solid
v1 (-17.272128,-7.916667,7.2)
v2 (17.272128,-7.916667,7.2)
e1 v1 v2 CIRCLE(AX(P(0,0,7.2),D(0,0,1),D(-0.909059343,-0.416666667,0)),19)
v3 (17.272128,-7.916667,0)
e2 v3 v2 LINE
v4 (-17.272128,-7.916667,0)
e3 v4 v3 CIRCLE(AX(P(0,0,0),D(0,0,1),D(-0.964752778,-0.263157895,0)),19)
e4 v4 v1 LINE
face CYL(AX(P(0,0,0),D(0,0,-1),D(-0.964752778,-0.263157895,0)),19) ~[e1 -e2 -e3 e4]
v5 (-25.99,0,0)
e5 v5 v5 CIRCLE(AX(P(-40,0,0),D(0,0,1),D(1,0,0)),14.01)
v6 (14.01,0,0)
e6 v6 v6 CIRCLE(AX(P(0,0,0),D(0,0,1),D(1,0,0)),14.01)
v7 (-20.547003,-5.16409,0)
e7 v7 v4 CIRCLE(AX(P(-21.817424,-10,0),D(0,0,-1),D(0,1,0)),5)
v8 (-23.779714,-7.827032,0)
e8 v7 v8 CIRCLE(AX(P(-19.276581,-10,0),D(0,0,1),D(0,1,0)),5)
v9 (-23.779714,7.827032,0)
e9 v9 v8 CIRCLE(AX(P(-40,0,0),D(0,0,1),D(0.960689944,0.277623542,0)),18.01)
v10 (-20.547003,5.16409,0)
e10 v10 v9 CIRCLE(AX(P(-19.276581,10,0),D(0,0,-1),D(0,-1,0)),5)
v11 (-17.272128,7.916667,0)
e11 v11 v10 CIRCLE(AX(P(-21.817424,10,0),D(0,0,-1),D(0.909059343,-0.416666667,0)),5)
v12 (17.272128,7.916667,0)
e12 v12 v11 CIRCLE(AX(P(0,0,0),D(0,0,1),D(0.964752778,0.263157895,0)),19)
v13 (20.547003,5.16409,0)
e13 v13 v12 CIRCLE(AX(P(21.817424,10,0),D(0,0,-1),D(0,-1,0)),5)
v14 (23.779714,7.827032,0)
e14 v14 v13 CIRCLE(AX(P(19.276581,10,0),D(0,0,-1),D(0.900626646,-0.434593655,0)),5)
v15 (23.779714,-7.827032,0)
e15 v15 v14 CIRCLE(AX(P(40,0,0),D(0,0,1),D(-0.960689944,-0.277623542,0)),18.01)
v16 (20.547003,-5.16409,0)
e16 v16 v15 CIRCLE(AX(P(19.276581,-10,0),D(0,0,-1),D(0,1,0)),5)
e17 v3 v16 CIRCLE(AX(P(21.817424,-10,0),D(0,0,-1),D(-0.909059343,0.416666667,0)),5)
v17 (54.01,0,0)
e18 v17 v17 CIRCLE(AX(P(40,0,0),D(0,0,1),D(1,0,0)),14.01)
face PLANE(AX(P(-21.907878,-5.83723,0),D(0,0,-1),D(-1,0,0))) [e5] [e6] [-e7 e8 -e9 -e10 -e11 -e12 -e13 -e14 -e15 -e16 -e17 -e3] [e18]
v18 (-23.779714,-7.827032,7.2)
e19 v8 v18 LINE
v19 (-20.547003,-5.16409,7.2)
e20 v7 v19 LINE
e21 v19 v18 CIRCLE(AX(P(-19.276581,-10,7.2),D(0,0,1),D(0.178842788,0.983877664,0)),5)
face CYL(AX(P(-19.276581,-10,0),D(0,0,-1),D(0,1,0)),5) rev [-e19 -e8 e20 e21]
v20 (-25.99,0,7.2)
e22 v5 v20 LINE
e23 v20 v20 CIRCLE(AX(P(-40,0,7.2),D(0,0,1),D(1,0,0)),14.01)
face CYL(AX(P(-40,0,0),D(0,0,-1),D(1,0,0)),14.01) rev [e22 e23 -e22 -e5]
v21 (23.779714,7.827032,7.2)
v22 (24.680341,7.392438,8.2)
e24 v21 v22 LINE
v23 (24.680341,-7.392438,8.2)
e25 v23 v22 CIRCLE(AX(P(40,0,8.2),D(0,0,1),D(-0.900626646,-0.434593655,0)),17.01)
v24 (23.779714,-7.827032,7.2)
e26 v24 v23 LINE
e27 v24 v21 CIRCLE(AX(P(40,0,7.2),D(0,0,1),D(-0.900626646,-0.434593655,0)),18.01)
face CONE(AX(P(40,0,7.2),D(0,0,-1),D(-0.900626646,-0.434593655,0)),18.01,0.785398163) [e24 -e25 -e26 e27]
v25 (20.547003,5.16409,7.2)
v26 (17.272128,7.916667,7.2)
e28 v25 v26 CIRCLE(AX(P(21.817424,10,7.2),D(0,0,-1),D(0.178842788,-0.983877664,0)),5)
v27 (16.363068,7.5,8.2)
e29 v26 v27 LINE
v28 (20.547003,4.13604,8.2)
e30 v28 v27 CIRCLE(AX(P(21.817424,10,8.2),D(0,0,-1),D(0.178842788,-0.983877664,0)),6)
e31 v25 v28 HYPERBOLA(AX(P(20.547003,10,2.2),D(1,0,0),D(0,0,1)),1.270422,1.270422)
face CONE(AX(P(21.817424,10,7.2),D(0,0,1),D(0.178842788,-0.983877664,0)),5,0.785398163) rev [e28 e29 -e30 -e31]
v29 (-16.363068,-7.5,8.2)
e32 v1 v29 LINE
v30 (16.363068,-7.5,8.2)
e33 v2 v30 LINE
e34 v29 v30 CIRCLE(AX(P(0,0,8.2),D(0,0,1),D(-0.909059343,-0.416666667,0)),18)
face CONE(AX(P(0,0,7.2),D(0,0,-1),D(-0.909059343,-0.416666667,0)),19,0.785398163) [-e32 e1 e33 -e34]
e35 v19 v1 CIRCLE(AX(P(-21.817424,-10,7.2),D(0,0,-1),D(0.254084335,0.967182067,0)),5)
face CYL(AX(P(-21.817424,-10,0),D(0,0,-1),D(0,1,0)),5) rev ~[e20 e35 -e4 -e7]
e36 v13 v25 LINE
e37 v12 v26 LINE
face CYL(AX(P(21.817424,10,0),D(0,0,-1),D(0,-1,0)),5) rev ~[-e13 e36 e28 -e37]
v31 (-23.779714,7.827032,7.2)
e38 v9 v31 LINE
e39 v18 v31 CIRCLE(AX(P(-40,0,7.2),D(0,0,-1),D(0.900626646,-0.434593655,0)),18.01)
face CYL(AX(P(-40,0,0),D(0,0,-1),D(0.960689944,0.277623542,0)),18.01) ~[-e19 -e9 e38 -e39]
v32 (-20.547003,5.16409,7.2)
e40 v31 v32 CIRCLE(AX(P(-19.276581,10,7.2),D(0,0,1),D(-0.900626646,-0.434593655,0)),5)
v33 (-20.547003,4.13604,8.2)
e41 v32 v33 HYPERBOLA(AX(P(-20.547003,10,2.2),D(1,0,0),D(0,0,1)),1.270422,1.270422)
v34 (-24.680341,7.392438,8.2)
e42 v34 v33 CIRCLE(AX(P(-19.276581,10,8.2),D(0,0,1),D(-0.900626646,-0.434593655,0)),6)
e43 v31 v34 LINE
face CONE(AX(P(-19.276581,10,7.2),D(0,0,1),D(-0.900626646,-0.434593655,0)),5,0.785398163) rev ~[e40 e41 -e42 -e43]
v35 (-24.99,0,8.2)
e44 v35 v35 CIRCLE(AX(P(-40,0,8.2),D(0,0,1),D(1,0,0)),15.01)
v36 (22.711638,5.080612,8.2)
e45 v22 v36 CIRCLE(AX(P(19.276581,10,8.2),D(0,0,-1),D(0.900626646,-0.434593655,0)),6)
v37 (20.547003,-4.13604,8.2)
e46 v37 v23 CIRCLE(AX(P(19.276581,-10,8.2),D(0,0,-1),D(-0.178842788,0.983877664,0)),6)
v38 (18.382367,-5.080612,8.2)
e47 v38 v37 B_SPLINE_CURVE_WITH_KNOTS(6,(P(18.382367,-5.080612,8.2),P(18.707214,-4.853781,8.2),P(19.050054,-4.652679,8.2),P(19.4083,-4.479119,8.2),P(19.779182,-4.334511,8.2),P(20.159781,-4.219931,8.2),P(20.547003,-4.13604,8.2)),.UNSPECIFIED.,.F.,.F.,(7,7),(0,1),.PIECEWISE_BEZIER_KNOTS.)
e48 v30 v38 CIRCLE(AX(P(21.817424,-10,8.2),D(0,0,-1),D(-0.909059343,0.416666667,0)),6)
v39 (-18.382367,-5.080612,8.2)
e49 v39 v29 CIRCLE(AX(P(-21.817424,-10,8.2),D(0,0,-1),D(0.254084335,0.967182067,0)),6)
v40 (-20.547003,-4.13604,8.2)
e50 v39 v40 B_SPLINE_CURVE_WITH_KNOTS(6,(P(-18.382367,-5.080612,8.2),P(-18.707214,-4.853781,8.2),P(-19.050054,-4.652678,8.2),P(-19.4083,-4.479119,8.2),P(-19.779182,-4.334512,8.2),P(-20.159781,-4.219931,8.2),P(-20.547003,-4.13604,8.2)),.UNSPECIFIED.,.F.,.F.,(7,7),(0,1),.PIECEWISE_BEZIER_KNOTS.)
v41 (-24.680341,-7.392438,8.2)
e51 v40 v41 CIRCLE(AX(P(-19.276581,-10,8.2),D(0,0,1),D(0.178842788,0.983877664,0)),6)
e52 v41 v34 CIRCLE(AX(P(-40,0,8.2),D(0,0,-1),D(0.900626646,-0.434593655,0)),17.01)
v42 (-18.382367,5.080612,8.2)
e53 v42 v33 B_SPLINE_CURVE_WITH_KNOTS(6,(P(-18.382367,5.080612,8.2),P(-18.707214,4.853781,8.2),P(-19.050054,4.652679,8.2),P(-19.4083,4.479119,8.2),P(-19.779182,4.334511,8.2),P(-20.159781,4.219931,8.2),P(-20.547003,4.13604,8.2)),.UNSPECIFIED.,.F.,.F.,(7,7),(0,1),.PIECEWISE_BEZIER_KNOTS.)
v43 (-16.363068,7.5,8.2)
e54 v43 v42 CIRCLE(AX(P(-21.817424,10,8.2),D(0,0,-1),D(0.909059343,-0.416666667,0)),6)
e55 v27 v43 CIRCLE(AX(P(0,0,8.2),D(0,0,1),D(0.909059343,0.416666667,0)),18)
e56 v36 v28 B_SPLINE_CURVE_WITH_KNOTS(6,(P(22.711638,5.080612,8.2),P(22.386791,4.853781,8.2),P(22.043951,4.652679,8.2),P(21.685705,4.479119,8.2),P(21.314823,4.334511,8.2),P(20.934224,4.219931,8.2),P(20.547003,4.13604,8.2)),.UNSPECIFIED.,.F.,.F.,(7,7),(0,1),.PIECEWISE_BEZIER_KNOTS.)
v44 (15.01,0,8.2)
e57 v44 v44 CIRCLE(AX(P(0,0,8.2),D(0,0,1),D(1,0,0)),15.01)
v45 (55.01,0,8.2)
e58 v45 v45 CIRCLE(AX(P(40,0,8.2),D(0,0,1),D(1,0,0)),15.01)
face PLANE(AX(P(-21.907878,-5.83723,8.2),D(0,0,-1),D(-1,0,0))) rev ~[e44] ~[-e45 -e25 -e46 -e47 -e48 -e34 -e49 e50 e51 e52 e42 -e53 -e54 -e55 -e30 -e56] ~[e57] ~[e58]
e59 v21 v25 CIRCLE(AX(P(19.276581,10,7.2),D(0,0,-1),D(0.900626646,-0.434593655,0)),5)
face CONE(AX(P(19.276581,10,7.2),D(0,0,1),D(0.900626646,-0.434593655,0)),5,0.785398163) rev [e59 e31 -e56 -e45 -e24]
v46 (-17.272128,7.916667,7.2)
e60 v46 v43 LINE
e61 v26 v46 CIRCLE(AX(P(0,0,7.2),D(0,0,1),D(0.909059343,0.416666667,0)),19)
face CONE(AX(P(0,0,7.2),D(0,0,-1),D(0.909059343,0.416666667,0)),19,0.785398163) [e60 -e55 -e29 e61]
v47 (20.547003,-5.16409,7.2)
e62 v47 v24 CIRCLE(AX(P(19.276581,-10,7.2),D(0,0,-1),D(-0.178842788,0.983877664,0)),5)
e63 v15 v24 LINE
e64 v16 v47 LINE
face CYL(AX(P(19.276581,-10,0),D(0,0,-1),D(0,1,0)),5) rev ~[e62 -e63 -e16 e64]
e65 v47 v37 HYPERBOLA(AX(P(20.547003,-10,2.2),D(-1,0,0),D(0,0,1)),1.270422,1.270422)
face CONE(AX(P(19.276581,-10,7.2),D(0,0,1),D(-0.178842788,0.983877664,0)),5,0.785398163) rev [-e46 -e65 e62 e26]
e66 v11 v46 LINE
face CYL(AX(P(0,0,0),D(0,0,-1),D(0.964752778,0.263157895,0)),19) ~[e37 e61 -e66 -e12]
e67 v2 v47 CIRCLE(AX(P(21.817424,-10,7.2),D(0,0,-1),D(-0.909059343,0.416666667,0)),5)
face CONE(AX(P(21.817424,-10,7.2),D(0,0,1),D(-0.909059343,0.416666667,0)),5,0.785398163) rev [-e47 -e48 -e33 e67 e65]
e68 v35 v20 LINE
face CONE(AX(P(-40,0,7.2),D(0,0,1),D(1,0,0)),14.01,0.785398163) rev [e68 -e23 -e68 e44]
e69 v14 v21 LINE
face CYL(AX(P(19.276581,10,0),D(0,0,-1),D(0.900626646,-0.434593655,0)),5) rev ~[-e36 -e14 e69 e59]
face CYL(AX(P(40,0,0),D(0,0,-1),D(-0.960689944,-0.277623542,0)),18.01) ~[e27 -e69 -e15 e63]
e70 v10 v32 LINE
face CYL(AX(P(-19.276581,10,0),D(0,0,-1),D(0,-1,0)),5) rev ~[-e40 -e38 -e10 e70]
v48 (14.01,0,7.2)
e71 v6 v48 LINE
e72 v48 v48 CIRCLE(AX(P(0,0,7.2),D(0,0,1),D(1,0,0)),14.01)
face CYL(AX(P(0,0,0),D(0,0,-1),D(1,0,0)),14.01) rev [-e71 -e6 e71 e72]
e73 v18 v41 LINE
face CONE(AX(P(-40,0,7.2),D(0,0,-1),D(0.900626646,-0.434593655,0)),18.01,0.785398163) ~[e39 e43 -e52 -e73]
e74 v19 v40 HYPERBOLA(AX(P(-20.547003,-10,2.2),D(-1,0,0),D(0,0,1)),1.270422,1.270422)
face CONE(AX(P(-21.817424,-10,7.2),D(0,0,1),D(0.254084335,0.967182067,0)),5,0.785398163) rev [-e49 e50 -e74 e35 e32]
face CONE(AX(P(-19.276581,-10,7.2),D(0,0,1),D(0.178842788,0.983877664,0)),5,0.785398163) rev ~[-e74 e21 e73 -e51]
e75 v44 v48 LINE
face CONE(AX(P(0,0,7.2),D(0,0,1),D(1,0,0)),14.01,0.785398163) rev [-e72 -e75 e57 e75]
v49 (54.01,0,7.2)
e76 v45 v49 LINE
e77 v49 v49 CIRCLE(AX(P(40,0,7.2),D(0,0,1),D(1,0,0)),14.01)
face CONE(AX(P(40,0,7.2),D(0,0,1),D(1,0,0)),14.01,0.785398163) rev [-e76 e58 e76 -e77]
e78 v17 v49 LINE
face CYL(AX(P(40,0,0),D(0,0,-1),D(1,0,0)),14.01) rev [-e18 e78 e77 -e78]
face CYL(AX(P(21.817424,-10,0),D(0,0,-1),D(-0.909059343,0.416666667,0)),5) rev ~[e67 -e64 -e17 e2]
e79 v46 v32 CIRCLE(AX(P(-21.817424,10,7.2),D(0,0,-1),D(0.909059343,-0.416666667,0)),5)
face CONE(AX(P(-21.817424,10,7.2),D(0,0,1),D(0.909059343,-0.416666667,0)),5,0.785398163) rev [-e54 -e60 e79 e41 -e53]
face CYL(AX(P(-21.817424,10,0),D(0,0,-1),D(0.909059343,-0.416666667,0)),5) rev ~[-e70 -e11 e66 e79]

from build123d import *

# Parameters (mm, degrees)
F0_R        = 14.01
F1_DEPTH    = 8.2
F2_T1_DEPTH = 8.2
F3_C1_SIZE  = 1
F3_C2_SIZE  = 1
F3_C3_SIZE  = 1
F3_C4_SIZE  = 1
F3_C5_SIZE  = 1
F3_C6_SIZE  = 1
F3_C7_SIZE  = 1


# Not quite as in the source:
# - a fillet or chamfer that OpenCascade refuses, or shapes differently, is made with other operations: its cross-section is extruded or revolved along the edge and cut away or added


with BuildPart() as f1:
    # F0 (on Top) → F1 (new body)
    with BuildSketch(Plane.XY):
        with BuildLine():
            Line((-22.6979741071, -5), (-18.3303027798, -5))
            ThreePointArc((-18.3303027798, -5), (0, -19), (18.3303027798, -5))
            Line((18.3303027798, -5), (22.6979741071, -5))
            ThreePointArc((22.6979741071, -5), (58.01, 0), (22.6979741071, 5))
            Line((22.6979741071, 5), (18.3303027798, 5))
            ThreePointArc((18.3303027798, 5), (0, 19), (-18.3303027798, 5))
            Line((-18.3303027798, 5), (-22.6979741071, 5))
            ThreePointArc((-22.6979741071, 5), (-58.01, 0), (-22.6979741071, -5))
        make_face()
        with Locations((-40, 0)):
            Circle(F0_R, mode=Mode.SUBTRACT)
        Circle(F0_R, mode=Mode.SUBTRACT)
        with Locations((40, 0)):
            Circle(F0_R, mode=Mode.SUBTRACT)
    extrude(amount=F1_DEPTH)

    # F2: fillet of radius 5 on 8 edges, made by hand

    # F2_s2 → F2_t1 (join)
    with BuildSketch(Plane.XY):
        with BuildLine():
            ThreePointArc((-19.2765808806, -5), (-21.9350728052, -5.7653311007), (-23.7797141095, -7.8270317253))
            ThreePointArc((-23.7797141095, -7.8270317253), (-23.1793468046, -6.4362820074), (-22.6979741071, -5))
            Line((-22.6979741071, -5), (-19.2765808806, -5))
        make_face()
        with BuildLine():
            ThreePointArc((-21.8174242293, -5), (-19.1171156049, -5.7918729423), (-17.2721275148, -7.9166666667))
            ThreePointArc((-17.2721275148, -7.9166666667), (-17.8608509549, -6.4799693801), (-18.3303027798, -5))
            Line((-18.3303027798, -5), (-21.8174242293, -5))
        make_face()
        with BuildLine():
            ThreePointArc((17.2721275148, -7.9166666667), (19.1171156049, -5.7918729423), (21.8174242293, -5))
            Line((21.8174242293, -5), (18.3303027798, -5))
            ThreePointArc((18.3303027798, -5), (17.8608509549, -6.4799693801), (17.2721275148, -7.9166666667))
        make_face()
        with BuildLine():
            ThreePointArc((19.2765808806, -5), (21.9350728052, -5.7653311007), (23.7797141095, -7.8270317253))
            ThreePointArc((23.7797141095, -7.8270317253), (23.1793468046, -6.4362820074), (22.6979741071, -5))
            Line((22.6979741071, -5), (19.2765808806, -5))
        make_face()
        with BuildLine():
            ThreePointArc((21.8174242293, 5), (19.1171156049, 5.7918729423), (17.2721275148, 7.9166666667))
            ThreePointArc((17.2721275148, 7.9166666667), (17.8608509549, 6.4799693801), (18.3303027798, 5))
            Line((18.3303027798, 5), (21.8174242293, 5))
        make_face()
        with BuildLine():
            ThreePointArc((23.7797141095, 7.8270317253), (21.9350728052, 5.7653311007), (19.2765808806, 5))
            Line((19.2765808806, 5), (22.6979741071, 5))
            ThreePointArc((22.6979741071, 5), (23.1793468046, 6.4362820074), (23.7797141095, 7.8270317253))
        make_face()
        with BuildLine():
            ThreePointArc((-17.2721275148, 7.9166666667), (-19.1171156049, 5.7918729423), (-21.8174242293, 5))
            Line((-21.8174242293, 5), (-18.3303027798, 5))
            ThreePointArc((-18.3303027798, 5), (-17.8608509549, 6.4799693801), (-17.2721275148, 7.9166666667))
        make_face()
        with BuildLine():
            ThreePointArc((-19.2765808806, 5), (-21.9350728052, 5.7653311007), (-23.7797141095, 7.8270317253))
            ThreePointArc((-23.7797141095, 7.8270317253), (-23.1793468046, 6.4362820074), (-22.6979741071, 5))
            Line((-22.6979741071, 5), (-19.2765808806, 5))
        make_face()
    extrude(amount=F2_T1_DEPTH)

    # F3: chamfer of 1 on 15 edges, made by hand

    # F3_c1
    f3_c1_edges = [f1.edges().sort_by_distance(p)[0] for p in [
        (0, -19, 8.2),
        (18.6003113726, -6.1724440085, 8.2),
        (-18.6003113726, -6.1724440085, 8.2),
    ]]
    chamfer(f3_c1_edges, length=F3_C1_SIZE)

    # F3_c2
    f3_c2_edges = [f1.edges().sort_by_distance(p)[0] for p in [
        (22.4556214842, -6.1407642155, 8.2),
        (58.01, 0, 8.2),
        (22.4556214842, 6.1407642155, 8.2),
    ]]
    chamfer(f3_c2_edges, length=F3_C2_SIZE)

    # F3_c3
    f3_c3_edges = [f1.edges().sort_by_distance(p)[0] for p in [
        (18.6003113726, 6.1724440085, 8.2),
        (0, 19, 8.2),
        (-18.6003113726, 6.1724440085, 8.2),
    ]]
    chamfer(f3_c3_edges, length=F3_C3_SIZE)

    # F3_c4
    f3_c4_edges = [f1.edges().sort_by_distance(p)[0] for p in [
        (-22.4556214842, 6.1407642155, 8.2),
        (-58.01, 0, 8.2),
        (-22.4556214842, -6.1407642155, 8.2),
    ]]
    chamfer(f3_c4_edges, length=F3_C4_SIZE)

    # F3_c5
    f3_c5_edges = [f1.edges().sort_by_distance(p)[0] for p in [
        (-54.01, 0, 8.2),
    ]]
    chamfer(f3_c5_edges, length=F3_C5_SIZE)

    # F3_c6
    f3_c6_edges = [f1.edges().sort_by_distance(p)[0] for p in [
        (-14.01, 0, 8.2),
    ]]
    chamfer(f3_c6_edges, length=F3_C6_SIZE)

    # F3_c7
    f3_c7_edges = [f1.edges().sort_by_distance(p)[0] for p in [
        (25.99, 0, 8.2),
    ]]
    chamfer(f3_c7_edges, length=F3_C7_SIZE)


solid = f1.part
